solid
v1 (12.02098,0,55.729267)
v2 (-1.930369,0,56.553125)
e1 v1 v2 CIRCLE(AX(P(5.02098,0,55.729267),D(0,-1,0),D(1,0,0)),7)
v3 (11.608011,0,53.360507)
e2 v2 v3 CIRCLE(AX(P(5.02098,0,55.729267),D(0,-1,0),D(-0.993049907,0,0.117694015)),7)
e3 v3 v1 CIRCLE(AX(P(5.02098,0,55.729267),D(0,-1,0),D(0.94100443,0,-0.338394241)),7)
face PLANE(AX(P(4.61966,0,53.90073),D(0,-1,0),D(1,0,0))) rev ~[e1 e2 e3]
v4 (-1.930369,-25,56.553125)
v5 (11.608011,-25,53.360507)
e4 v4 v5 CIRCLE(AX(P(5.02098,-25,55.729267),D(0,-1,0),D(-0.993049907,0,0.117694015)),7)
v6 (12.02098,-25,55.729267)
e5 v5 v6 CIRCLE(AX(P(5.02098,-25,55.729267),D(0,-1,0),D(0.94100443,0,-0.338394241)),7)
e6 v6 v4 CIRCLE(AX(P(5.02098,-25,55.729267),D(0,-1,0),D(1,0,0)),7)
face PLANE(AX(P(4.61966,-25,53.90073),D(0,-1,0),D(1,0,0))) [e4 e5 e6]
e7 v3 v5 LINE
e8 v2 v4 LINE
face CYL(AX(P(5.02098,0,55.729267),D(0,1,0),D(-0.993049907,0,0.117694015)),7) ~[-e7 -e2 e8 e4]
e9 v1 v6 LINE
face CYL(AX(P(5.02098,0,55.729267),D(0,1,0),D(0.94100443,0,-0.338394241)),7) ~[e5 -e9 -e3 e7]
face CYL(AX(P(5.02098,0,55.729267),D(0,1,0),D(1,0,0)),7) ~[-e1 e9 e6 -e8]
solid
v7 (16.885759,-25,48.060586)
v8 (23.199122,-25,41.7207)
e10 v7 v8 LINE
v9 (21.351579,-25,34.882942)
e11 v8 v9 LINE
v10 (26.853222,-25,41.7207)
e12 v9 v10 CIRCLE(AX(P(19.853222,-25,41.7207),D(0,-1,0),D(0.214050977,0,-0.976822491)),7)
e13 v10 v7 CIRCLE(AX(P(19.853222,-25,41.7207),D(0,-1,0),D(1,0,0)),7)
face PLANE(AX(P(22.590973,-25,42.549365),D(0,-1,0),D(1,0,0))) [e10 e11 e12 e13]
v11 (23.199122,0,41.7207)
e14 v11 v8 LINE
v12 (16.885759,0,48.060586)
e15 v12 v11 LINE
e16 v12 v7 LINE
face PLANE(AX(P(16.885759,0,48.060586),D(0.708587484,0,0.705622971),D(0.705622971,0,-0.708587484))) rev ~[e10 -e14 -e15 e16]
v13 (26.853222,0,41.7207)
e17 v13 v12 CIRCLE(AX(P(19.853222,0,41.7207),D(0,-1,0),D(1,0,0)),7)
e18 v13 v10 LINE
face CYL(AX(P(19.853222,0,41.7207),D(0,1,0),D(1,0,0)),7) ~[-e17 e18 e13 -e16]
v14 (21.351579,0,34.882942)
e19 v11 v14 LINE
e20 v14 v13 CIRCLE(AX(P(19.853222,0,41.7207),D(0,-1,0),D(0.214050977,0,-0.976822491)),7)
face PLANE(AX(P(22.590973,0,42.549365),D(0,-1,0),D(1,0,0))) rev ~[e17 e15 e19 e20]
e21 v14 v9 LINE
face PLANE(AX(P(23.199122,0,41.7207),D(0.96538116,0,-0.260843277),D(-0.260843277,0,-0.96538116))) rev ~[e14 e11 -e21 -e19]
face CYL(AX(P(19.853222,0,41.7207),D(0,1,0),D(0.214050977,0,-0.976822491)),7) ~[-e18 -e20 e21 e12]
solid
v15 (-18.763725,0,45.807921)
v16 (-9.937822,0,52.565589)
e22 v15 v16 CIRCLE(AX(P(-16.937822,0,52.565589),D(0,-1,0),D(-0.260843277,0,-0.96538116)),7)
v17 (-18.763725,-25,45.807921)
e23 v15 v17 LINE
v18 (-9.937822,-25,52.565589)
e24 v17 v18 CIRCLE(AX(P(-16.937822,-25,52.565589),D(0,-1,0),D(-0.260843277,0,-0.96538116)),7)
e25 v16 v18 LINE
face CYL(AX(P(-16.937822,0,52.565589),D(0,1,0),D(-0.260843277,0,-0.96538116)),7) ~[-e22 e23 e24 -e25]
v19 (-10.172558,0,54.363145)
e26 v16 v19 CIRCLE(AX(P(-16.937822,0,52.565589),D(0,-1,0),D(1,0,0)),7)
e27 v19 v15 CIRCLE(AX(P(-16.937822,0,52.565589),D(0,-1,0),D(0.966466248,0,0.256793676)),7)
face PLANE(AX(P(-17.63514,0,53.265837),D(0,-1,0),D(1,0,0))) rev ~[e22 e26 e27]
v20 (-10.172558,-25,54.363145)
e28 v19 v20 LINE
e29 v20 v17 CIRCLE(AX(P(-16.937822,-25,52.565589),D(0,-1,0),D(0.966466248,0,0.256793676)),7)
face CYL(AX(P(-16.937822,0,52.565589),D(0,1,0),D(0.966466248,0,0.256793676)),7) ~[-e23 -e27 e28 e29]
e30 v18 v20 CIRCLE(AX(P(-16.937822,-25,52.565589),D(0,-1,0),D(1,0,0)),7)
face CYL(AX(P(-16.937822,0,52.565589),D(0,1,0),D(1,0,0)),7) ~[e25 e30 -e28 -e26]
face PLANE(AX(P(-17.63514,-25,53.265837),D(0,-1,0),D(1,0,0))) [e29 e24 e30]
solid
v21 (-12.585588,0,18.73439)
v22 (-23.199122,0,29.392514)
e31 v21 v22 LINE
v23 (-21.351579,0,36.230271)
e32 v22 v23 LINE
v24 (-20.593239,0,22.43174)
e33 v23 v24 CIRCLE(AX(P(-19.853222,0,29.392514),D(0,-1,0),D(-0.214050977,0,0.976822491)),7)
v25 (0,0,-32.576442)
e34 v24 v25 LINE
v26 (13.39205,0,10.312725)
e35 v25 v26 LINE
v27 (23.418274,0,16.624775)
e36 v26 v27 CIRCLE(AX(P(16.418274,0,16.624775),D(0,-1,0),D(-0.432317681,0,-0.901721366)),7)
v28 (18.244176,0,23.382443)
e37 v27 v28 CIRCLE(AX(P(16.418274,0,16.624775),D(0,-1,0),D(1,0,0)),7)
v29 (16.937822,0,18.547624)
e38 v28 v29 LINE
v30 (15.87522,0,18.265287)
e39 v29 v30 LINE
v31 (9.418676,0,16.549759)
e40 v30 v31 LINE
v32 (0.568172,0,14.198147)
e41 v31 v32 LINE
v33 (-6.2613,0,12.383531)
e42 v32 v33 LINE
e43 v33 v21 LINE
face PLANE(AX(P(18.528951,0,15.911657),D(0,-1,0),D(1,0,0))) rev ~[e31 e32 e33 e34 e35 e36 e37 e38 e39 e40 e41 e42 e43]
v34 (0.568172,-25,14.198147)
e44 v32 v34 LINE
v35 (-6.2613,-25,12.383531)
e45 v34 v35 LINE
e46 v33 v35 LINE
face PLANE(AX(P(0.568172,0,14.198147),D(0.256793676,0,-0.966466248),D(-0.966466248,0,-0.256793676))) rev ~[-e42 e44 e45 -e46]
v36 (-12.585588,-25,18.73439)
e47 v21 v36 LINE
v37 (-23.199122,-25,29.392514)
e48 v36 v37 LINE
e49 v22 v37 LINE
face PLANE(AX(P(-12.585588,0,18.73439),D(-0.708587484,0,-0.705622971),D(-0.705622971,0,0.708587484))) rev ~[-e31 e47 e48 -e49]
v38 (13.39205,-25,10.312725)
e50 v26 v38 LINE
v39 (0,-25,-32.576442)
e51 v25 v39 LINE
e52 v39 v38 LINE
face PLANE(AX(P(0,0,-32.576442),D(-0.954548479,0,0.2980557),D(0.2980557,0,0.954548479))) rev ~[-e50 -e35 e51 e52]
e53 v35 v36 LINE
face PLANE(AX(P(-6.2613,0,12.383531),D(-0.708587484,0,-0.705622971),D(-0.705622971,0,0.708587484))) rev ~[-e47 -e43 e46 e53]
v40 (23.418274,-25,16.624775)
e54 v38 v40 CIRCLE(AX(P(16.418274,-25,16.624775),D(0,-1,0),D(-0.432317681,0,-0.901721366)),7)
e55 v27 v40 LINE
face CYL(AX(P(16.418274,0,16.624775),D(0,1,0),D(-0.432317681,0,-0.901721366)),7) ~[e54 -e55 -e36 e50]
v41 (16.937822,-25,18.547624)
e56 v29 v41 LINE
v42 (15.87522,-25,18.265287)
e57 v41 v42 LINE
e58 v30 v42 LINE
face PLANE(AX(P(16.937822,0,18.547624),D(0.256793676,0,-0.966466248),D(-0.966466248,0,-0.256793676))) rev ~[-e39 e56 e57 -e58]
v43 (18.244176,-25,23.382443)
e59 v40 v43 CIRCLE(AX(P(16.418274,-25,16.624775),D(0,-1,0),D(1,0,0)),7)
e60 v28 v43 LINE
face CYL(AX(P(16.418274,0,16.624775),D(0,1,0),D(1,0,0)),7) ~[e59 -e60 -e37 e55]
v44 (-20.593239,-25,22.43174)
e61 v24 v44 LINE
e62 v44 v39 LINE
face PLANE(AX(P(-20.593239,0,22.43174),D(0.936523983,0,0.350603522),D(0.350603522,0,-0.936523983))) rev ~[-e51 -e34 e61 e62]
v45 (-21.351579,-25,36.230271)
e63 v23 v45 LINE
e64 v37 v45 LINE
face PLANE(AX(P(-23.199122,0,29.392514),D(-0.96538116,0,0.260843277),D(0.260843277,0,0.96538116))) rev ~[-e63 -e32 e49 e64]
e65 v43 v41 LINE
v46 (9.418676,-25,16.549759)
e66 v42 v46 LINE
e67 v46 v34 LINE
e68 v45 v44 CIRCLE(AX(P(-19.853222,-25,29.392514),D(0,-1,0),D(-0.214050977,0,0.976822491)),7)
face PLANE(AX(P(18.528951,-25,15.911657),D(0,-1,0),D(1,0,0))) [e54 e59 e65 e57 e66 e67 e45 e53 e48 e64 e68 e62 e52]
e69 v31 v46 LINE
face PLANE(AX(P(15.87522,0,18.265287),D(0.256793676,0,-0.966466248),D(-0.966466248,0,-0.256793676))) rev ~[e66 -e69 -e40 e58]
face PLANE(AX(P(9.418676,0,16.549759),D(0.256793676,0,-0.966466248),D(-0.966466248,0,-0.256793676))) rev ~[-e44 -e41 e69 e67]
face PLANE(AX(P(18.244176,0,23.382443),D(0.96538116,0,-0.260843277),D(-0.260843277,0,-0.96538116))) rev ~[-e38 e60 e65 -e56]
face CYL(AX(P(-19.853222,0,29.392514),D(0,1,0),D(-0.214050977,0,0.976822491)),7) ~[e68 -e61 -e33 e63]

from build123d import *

# Parameters (mm, degrees)
F1_DEPTH = 25


with BuildPart() as f1:
    # F0 (on Front) → F1 (new body)
    with BuildSketch(Plane.XZ):
        with BuildLine():
            Line((18.2441764877, 23.3824430568), (16.9378220156, 18.5476241928))
            Line((16.9378220156, 18.5476241928), (15.8752199276, 18.2652868666))
            Line((15.8752199276, 18.2652868666), (13.3920497807, 10.3127253695))
            ThreePointArc((13.3920497807, 10.3127253695), (20.1476457227, 10.7009431346), (23.4182735487, 16.6247749341))
            ThreePointArc((23.4182735487, 16.6247749341), (21.976210242, 20.8802819207), (18.2441764877, 23.3824430568))
        make_face()
        with BuildLine():
            Line((13.3920497807, 10.3127253695), (15.8752199276, 18.2652868666))
            Line((15.8752199276, 18.2652868666), (9.4186755166, 16.5497590075))
            ThreePointArc((9.4186755166, 16.5497590075), (10.5145101014, 12.8637142914), (13.3920497807, 10.3127253695))
        make_face()
        with BuildLine():
            ThreePointArc((13.3920497807, 10.3127253695), (10.5145101014, 12.8637142914), (9.4186755166, 16.5497590075))
            Line((9.4186755166, 16.5497590075), (0.5681722049, 14.1981473662))
            ThreePointArc((0.5681722049, 14.1981473662), (-8.5434427291, 9.1162877381), (-12.5855881849, 18.734389635))
            Line((-12.5855881849, 18.734389635), (-16.8857592738, 23.0526269106))
            ThreePointArc((-16.8857592738, 23.0526269106), (-18.6970412303, 22.4886563526), (-20.5932388995, 22.4317396104))
            Line((-20.5932388995, 22.4317396104), (0, -32.5764417648))
            Line((0, -32.5764417648), (13.3920497807, 10.3127253695))
        make_face()
        with BuildLine():
            ThreePointArc((-12.5855881849, 18.734389635), (-8.5434427291, 9.1162877381), (0.5681722049, 14.1981473662))
            Line((0.5681722049, 14.1981473662), (-6.2612998485, 12.3835312456))
            Line((-6.2612998485, 12.3835312456), (-12.5855881849, 18.734389635))
        make_face()
        with BuildLine():
            Line((-23.1991218641, 29.3925136519), (-20.5932388995, 22.4317396104))
            ThreePointArc((-20.5932388995, 22.4317396104), (-18.6970412303, 22.4886563526), (-16.8857592738, 23.0526269106))
            Line((-16.8857592738, 23.0526269106), (-23.1991218641, 29.3925136519))
        make_face()
        with BuildLine():
            ThreePointArc((-21.351579017, 36.2302710908), (-26.8426747205, 29.0083871043), (-20.5932388995, 22.4317396104))
            Line((-20.5932388995, 22.4317396104), (-23.1991218641, 29.3925136519))
            Line((-23.1991218641, 29.3925136519), (-21.3515790169, 36.2302710908))
        make_face()
    extrude(amount=F1_DEPTH)


with BuildPart() as f1b:
    # F0 (on Front) → F1, piece 2 (new body)
    with BuildSketch(Plane.XZ):
        with BuildLine():
            Line((23.1991218641, 41.7206995462), (21.3515790169, 34.8829421073))
            ThreePointArc((21.351579017, 34.8829421073), (25.307051013, 37.3325620056), (26.8532221814, 41.7206995462))
            ThreePointArc((26.8532221814, 41.7206995462), (23.6100665785, 47.6271468859), (16.8857592738, 48.0605862875))
            Line((16.8857592738, 48.0605862875), (23.1991218641, 41.7206995462))
        make_face()
    extrude(amount=F1_DEPTH)


with BuildPart() as f1c:
    # F0 (on Front) → F1, piece 3 (new body)
    with BuildSketch(Plane.XZ):
        with BuildLine():
            ThreePointArc((-1.9303688689, 56.5531251129), (3.414311862, 48.916146138), (11.6080114951, 53.3605073181))
            Line((11.6080114951, 53.3605073181), (6.2612998485, 58.7296819525))
            Line((6.2612998485, 58.7296819525), (4.6632730761, 58.3050802966))
            Line((4.6632730761, 58.3050802966), (-1.9303688689, 56.5531251129))
        make_face()
        with BuildLine():
            Line((6.2612998485, 58.7296819525), (11.6080114951, 53.3605073181))
            ThreePointArc((11.6080114951, 53.3605073181), (11.9169654414, 54.5270226619), (12.0209804834, 55.7292670045))
            ThreePointArc((12.0209804834, 55.7292670045), (5.4336271447, 62.7170937577), (-1.9303688689, 56.5531251129))
            Line((-1.9303688689, 56.5531251129), (4.6632730761, 58.3050802966))
            Line((4.6632730761, 58.3050802966), (6.2612998485, 58.7296819525))
        make_face()
    extrude(amount=F1_DEPTH)


with BuildPart() as f1d:
    # F0 (on Front) → F1, piece 4 (new body)
    with BuildSketch(Plane.XZ):
        with BuildLine():
            ThreePointArc((-10.1725582814, 54.3631447367), (-21.8771828108, 57.5257013967), (-18.7637249546, 45.8079208825))
            Line((-18.7637249546, 45.8079208825), (-16.9378220156, 52.5655890053))
            Line((-16.9378220156, 52.5655890053), (-10.1725582814, 54.3631447367))
        make_face()
        with BuildLine():
            Line((-16.9378220156, 52.5655890053), (-18.7637249546, 45.8079208825))
            ThreePointArc((-18.7637249546, 45.8079208825), (-12.6823150289, 47.007652312), (-9.9378220156, 52.5655890053))
            ThreePointArc((-9.9378220156, 52.5655890053), (-9.9967541533, 53.4719978151), (-10.1725582814, 54.3631447367))
            Line((-10.1725582814, 54.3631447367), (-16.9378220156, 52.5655890053))
        make_face()
    extrude(amount=F1_DEPTH)


solid = Compound([f1.part, f1b.part, f1c.part, f1d.part])
